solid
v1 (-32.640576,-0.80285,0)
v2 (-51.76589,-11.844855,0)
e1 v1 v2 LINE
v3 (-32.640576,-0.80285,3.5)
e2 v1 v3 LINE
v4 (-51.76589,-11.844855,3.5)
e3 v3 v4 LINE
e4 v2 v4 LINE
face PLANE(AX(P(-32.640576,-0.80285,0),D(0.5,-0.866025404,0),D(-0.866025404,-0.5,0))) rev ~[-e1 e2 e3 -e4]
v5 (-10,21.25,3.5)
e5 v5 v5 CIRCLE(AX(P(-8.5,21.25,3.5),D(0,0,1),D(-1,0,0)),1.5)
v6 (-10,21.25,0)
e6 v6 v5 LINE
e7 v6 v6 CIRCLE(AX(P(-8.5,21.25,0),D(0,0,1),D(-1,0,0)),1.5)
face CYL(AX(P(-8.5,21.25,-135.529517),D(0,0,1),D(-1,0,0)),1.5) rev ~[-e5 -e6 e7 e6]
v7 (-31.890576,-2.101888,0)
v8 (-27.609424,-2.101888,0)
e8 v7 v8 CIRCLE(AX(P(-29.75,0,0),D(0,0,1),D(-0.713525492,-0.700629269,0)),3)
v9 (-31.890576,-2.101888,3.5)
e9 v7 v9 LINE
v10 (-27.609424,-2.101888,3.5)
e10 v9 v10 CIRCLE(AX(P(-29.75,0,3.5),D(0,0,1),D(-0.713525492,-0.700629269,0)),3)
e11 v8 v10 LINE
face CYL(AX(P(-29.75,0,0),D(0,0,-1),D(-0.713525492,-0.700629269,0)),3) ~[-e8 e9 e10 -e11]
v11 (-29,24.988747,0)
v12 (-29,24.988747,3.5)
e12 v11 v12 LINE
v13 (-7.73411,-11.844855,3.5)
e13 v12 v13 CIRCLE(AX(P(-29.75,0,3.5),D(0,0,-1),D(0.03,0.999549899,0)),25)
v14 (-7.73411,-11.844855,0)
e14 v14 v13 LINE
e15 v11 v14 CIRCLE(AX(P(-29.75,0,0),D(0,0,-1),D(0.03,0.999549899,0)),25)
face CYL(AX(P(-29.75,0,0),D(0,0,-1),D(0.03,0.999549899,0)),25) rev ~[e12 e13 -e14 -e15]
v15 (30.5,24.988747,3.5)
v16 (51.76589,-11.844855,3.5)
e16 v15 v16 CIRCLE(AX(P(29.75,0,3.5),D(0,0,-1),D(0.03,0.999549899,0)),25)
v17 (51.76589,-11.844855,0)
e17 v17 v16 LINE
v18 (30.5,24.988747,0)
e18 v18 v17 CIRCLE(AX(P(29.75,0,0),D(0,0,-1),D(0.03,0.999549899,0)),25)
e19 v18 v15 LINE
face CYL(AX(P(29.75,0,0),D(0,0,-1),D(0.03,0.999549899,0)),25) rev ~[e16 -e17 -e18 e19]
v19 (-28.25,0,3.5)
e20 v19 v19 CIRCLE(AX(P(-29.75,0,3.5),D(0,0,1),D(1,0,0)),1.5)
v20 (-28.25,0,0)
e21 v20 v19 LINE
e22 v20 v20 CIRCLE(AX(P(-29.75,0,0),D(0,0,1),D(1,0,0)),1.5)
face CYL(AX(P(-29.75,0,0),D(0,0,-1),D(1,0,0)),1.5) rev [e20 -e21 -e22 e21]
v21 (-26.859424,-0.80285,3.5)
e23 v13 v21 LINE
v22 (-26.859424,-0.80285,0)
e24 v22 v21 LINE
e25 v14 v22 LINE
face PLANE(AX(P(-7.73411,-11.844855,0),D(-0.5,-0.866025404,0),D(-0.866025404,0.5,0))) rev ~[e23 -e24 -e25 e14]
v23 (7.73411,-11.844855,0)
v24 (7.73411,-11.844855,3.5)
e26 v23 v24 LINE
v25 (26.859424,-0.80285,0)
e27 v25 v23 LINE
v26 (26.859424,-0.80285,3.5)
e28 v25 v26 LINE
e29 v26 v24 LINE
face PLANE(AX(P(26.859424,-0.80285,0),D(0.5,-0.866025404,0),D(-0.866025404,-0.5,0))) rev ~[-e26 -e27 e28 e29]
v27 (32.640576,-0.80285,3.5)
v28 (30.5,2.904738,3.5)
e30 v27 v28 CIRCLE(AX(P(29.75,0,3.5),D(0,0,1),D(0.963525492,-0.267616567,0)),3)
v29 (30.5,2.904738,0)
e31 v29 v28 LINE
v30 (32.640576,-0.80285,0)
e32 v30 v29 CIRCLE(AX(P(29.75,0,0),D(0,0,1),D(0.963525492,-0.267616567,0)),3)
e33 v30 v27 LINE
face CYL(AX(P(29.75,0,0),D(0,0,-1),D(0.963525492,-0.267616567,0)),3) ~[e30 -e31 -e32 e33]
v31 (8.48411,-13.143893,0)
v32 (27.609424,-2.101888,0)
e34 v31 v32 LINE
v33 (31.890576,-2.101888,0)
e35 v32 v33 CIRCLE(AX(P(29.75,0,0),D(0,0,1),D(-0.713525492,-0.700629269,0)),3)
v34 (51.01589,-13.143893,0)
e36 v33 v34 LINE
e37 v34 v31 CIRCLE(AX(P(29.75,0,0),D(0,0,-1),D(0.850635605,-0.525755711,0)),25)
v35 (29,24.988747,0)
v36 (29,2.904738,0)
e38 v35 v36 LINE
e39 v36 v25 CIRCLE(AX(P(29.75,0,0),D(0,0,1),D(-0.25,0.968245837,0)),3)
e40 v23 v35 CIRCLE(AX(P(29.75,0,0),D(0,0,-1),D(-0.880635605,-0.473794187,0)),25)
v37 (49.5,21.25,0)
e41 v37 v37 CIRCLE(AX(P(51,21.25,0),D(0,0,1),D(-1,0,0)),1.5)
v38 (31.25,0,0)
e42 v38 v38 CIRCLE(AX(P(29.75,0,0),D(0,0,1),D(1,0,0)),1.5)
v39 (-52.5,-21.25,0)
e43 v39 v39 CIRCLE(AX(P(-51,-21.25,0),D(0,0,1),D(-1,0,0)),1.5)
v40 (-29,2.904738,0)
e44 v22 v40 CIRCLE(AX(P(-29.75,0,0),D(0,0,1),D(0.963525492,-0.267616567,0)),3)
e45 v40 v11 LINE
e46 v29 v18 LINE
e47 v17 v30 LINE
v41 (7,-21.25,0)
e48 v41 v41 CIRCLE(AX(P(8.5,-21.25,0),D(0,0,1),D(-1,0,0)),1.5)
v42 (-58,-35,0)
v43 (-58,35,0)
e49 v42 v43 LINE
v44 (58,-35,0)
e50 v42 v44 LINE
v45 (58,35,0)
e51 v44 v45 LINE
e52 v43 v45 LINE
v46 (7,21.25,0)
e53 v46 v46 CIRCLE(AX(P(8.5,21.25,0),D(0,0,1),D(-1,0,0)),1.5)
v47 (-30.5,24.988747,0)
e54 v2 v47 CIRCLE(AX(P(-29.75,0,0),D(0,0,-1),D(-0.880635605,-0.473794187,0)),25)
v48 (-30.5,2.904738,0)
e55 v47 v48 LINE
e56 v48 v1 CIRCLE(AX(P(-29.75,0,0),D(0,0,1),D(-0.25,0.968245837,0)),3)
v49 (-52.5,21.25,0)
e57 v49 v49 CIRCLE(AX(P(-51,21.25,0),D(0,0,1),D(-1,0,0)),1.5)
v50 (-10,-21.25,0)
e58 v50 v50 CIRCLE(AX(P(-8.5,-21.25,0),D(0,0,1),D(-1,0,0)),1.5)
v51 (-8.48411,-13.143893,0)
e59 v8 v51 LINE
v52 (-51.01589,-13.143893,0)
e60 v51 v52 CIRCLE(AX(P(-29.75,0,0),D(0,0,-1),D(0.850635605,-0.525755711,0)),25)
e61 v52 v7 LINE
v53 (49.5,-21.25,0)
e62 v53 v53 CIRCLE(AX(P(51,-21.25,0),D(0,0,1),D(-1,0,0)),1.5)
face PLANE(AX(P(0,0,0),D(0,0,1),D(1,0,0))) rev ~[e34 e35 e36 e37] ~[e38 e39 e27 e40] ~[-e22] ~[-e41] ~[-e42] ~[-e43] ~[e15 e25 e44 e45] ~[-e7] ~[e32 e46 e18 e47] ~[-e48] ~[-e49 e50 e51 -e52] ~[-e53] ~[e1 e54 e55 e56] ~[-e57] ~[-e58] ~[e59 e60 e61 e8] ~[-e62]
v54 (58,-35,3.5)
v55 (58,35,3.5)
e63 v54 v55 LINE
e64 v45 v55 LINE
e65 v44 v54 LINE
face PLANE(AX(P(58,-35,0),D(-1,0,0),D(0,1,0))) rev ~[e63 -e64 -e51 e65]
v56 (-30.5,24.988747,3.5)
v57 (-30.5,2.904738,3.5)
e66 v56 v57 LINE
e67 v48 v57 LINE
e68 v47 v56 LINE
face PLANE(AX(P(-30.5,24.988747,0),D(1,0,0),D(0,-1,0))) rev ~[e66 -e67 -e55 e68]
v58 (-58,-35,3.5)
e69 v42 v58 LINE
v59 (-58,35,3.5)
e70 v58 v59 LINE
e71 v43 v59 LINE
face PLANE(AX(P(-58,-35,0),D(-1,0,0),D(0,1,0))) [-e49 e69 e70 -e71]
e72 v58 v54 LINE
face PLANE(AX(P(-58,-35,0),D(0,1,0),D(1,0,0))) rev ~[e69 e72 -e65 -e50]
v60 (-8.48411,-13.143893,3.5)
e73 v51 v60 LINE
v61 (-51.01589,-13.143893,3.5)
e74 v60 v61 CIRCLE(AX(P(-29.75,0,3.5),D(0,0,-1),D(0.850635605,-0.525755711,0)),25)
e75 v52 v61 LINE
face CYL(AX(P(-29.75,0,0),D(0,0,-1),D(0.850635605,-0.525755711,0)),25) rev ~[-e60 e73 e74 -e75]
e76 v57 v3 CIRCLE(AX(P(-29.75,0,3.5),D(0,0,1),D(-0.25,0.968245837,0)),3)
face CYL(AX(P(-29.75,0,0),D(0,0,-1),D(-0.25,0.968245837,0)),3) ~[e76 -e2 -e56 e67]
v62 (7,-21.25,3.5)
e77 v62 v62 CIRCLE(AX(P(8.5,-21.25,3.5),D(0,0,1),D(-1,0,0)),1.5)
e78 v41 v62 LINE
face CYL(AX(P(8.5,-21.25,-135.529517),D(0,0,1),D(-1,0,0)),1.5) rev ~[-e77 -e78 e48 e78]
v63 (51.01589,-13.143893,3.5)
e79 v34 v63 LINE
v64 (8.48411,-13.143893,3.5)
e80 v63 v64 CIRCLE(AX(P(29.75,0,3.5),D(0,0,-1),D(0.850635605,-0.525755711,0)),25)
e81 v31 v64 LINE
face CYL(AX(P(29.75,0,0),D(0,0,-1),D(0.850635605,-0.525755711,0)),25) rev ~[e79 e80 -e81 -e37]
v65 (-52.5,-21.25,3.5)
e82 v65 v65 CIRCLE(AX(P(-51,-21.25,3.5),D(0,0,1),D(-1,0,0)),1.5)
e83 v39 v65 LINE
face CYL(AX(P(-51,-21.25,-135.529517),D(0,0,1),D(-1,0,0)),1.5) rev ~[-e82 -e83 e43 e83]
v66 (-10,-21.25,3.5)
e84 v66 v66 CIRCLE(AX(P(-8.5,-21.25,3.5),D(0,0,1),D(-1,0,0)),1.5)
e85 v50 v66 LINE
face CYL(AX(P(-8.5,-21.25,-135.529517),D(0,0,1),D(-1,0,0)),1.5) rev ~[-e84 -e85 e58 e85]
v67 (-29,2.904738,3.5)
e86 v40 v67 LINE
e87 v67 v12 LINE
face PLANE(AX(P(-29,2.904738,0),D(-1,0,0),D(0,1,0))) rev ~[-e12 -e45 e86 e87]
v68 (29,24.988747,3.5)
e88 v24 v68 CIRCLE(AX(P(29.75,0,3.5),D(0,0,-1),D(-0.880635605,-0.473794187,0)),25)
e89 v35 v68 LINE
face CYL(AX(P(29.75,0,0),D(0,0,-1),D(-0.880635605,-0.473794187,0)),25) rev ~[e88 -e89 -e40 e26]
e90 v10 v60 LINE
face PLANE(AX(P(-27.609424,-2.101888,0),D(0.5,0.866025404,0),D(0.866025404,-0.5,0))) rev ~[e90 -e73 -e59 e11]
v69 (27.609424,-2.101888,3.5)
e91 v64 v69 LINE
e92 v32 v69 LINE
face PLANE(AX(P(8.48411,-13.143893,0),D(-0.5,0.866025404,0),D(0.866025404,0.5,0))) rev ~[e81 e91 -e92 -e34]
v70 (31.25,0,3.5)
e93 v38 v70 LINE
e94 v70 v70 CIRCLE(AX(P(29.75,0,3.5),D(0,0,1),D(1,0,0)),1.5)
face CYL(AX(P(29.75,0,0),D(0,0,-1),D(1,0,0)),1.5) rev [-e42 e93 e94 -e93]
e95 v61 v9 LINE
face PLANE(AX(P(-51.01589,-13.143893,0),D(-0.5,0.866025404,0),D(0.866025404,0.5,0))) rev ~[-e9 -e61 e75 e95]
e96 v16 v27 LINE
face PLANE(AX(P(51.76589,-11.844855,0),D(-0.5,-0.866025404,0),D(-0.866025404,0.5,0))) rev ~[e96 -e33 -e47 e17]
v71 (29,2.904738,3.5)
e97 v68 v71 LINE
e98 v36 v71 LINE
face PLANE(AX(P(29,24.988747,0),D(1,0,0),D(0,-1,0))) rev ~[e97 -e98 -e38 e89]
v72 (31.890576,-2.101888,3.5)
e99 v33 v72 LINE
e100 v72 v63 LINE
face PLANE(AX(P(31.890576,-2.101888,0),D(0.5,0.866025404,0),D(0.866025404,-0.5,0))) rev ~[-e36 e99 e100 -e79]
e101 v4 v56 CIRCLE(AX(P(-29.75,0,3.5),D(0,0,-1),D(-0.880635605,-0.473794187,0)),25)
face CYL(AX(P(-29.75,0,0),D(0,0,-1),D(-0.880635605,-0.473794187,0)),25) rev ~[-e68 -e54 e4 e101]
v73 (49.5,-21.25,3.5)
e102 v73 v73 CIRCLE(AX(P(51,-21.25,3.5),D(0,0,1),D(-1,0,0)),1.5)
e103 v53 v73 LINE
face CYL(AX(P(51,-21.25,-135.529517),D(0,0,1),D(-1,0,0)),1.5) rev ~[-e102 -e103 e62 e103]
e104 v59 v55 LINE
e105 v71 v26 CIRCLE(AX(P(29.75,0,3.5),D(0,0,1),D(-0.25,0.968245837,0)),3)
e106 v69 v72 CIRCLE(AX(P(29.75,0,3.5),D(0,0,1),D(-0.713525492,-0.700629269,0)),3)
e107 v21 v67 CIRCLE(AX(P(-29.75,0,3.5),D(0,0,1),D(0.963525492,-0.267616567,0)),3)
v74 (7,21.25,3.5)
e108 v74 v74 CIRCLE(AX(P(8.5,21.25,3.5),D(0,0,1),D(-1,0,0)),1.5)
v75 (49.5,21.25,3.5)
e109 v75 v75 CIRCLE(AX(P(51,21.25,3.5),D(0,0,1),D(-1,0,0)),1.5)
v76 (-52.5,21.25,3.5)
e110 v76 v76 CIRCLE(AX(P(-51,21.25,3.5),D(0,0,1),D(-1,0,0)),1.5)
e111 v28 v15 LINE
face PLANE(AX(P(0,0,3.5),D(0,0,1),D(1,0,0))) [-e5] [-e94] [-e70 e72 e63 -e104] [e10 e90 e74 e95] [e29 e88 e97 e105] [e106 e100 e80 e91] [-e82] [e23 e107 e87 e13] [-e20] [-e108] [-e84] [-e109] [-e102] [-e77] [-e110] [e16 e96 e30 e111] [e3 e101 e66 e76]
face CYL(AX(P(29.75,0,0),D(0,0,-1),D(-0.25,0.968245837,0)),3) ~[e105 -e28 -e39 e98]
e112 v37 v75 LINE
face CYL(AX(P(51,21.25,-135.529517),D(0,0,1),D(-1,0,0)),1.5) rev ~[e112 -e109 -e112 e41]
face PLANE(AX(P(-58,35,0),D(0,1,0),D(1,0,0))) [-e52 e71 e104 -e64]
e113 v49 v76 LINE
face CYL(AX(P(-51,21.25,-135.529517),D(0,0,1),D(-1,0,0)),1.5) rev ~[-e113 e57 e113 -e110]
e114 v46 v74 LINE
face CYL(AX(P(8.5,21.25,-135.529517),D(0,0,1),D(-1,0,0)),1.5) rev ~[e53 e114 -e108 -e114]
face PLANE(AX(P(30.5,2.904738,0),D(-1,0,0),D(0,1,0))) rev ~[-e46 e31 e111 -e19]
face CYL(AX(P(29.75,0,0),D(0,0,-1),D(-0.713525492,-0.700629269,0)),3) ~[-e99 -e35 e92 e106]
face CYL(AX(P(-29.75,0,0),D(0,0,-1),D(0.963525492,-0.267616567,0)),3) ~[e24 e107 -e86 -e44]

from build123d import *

# Parameters (mm, degrees)
F0_W     = 116
F0_H     = 70
F0_R     = 1.5
F1_DEPTH = 3.5
F2_D     = 3


# Not quite as in the source:
# - a feature names something its author has since deleted; it is built from what else it names


with BuildPart() as f1:
    # F0 (on Top) → F1 (new body)
    with BuildSketch(Plane.XY):
        Rectangle(F0_W, F0_H)
        with BuildLine():
            ThreePointArc((-8.4841098843, -13.1438927866), (-29.75, -25), (-51.0158901157, -13.1438927866))
            Line((-51.0158901157, -13.1438927866), (-31.8905764747, -2.1018878077))
            ThreePointArc((-31.8905764747, -2.1018878077), (-29.75, -3), (-27.6094235253, -2.1018878077))
            Line((-27.6094235253, -2.1018878077), (-8.4841098843, -13.1438927866))
        make_face(mode=Mode.SUBTRACT)
        with BuildLine():
            Line((31.8905764747, -2.1018878077), (51.0158901157, -13.1438927866))
            ThreePointArc((51.0158901157, -13.1438927866), (29.75, -25), (8.4841098843, -13.1438927866))
            Line((8.4841098843, -13.1438927866), (27.6094235253, -2.1018878077))
            ThreePointArc((27.6094235253, -2.1018878077), (29.75, -3), (31.8905764747, -2.1018878077))
        make_face(mode=Mode.SUBTRACT)
        with Locations((-29.75, 0)):
            Circle(F0_R, mode=Mode.SUBTRACT)
        with BuildLine():
            ThreePointArc((-51.7658901157, -11.844854681), (-51.4006350946, 12.5), (-30.5, 24.9887474676))
            Line((-30.5, 24.9887474676), (-30.5, 2.9047375097))
            ThreePointArc((-30.5, 2.9047375097), (-32.3480762114, 1.5), (-32.6405764747, -0.802849702))
            Line((-32.6405764747, -0.802849702), (-51.7658901157, -11.844854681))
        make_face(mode=Mode.SUBTRACT)
        with BuildLine():
            Line((-29, 2.9047375097), (-29, 24.9887474676))
            ThreePointArc((-29, 24.9887474676), (-8.0993649054, 12.5), (-7.7341098843, -11.844854681))
            Line((-7.7341098843, -11.844854681), (-26.8594235253, -0.802849702))
            ThreePointArc((-26.8594235253, -0.802849702), (-27.1519237886, 1.5), (-29, 2.9047375097))
        make_face(mode=Mode.SUBTRACT)
        with BuildLine():
            ThreePointArc((7.7341098843, -11.844854681), (8.0993649054, 12.5), (29, 24.9887474676))
            Line((29, 24.9887474676), (29, 2.9047375097))
            ThreePointArc((29, 2.9047375097), (27.1519237886, 1.5), (26.8594235253, -0.802849702))
            Line((26.8594235253, -0.802849702), (7.7341098843, -11.844854681))
        make_face(mode=Mode.SUBTRACT)
        with Locations((29.75, 0)):
            Circle(F0_R, mode=Mode.SUBTRACT)
        with BuildLine():
            Line((30.5, 2.9047375097), (30.5, 24.9887474676))
            ThreePointArc((30.5, 24.9887474676), (51.4006350946, 12.5), (51.7658901157, -11.844854681))
            Line((51.7658901157, -11.844854681), (32.6405764747, -0.802849702))
            ThreePointArc((32.6405764747, -0.802849702), (32.3480762114, 1.5), (30.5, 2.9047375097))
        make_face(mode=Mode.SUBTRACT)
    extrude(amount=F1_DEPTH)

    # F2 (through all)
    with Locations(Plane(origin=(0, 0, 0), x_dir=(1, 0, 0), z_dir=(0, 0, -1))):
        with Locations((-51, -21.25), (-51, 21.25), (-8.5, 21.25), (-8.5, -21.25), (8.5, -21.25), (8.5, 21.25), (51, 21.25), (51, -21.25)):
            Hole(F2_D / 2)


solid = f1.part
